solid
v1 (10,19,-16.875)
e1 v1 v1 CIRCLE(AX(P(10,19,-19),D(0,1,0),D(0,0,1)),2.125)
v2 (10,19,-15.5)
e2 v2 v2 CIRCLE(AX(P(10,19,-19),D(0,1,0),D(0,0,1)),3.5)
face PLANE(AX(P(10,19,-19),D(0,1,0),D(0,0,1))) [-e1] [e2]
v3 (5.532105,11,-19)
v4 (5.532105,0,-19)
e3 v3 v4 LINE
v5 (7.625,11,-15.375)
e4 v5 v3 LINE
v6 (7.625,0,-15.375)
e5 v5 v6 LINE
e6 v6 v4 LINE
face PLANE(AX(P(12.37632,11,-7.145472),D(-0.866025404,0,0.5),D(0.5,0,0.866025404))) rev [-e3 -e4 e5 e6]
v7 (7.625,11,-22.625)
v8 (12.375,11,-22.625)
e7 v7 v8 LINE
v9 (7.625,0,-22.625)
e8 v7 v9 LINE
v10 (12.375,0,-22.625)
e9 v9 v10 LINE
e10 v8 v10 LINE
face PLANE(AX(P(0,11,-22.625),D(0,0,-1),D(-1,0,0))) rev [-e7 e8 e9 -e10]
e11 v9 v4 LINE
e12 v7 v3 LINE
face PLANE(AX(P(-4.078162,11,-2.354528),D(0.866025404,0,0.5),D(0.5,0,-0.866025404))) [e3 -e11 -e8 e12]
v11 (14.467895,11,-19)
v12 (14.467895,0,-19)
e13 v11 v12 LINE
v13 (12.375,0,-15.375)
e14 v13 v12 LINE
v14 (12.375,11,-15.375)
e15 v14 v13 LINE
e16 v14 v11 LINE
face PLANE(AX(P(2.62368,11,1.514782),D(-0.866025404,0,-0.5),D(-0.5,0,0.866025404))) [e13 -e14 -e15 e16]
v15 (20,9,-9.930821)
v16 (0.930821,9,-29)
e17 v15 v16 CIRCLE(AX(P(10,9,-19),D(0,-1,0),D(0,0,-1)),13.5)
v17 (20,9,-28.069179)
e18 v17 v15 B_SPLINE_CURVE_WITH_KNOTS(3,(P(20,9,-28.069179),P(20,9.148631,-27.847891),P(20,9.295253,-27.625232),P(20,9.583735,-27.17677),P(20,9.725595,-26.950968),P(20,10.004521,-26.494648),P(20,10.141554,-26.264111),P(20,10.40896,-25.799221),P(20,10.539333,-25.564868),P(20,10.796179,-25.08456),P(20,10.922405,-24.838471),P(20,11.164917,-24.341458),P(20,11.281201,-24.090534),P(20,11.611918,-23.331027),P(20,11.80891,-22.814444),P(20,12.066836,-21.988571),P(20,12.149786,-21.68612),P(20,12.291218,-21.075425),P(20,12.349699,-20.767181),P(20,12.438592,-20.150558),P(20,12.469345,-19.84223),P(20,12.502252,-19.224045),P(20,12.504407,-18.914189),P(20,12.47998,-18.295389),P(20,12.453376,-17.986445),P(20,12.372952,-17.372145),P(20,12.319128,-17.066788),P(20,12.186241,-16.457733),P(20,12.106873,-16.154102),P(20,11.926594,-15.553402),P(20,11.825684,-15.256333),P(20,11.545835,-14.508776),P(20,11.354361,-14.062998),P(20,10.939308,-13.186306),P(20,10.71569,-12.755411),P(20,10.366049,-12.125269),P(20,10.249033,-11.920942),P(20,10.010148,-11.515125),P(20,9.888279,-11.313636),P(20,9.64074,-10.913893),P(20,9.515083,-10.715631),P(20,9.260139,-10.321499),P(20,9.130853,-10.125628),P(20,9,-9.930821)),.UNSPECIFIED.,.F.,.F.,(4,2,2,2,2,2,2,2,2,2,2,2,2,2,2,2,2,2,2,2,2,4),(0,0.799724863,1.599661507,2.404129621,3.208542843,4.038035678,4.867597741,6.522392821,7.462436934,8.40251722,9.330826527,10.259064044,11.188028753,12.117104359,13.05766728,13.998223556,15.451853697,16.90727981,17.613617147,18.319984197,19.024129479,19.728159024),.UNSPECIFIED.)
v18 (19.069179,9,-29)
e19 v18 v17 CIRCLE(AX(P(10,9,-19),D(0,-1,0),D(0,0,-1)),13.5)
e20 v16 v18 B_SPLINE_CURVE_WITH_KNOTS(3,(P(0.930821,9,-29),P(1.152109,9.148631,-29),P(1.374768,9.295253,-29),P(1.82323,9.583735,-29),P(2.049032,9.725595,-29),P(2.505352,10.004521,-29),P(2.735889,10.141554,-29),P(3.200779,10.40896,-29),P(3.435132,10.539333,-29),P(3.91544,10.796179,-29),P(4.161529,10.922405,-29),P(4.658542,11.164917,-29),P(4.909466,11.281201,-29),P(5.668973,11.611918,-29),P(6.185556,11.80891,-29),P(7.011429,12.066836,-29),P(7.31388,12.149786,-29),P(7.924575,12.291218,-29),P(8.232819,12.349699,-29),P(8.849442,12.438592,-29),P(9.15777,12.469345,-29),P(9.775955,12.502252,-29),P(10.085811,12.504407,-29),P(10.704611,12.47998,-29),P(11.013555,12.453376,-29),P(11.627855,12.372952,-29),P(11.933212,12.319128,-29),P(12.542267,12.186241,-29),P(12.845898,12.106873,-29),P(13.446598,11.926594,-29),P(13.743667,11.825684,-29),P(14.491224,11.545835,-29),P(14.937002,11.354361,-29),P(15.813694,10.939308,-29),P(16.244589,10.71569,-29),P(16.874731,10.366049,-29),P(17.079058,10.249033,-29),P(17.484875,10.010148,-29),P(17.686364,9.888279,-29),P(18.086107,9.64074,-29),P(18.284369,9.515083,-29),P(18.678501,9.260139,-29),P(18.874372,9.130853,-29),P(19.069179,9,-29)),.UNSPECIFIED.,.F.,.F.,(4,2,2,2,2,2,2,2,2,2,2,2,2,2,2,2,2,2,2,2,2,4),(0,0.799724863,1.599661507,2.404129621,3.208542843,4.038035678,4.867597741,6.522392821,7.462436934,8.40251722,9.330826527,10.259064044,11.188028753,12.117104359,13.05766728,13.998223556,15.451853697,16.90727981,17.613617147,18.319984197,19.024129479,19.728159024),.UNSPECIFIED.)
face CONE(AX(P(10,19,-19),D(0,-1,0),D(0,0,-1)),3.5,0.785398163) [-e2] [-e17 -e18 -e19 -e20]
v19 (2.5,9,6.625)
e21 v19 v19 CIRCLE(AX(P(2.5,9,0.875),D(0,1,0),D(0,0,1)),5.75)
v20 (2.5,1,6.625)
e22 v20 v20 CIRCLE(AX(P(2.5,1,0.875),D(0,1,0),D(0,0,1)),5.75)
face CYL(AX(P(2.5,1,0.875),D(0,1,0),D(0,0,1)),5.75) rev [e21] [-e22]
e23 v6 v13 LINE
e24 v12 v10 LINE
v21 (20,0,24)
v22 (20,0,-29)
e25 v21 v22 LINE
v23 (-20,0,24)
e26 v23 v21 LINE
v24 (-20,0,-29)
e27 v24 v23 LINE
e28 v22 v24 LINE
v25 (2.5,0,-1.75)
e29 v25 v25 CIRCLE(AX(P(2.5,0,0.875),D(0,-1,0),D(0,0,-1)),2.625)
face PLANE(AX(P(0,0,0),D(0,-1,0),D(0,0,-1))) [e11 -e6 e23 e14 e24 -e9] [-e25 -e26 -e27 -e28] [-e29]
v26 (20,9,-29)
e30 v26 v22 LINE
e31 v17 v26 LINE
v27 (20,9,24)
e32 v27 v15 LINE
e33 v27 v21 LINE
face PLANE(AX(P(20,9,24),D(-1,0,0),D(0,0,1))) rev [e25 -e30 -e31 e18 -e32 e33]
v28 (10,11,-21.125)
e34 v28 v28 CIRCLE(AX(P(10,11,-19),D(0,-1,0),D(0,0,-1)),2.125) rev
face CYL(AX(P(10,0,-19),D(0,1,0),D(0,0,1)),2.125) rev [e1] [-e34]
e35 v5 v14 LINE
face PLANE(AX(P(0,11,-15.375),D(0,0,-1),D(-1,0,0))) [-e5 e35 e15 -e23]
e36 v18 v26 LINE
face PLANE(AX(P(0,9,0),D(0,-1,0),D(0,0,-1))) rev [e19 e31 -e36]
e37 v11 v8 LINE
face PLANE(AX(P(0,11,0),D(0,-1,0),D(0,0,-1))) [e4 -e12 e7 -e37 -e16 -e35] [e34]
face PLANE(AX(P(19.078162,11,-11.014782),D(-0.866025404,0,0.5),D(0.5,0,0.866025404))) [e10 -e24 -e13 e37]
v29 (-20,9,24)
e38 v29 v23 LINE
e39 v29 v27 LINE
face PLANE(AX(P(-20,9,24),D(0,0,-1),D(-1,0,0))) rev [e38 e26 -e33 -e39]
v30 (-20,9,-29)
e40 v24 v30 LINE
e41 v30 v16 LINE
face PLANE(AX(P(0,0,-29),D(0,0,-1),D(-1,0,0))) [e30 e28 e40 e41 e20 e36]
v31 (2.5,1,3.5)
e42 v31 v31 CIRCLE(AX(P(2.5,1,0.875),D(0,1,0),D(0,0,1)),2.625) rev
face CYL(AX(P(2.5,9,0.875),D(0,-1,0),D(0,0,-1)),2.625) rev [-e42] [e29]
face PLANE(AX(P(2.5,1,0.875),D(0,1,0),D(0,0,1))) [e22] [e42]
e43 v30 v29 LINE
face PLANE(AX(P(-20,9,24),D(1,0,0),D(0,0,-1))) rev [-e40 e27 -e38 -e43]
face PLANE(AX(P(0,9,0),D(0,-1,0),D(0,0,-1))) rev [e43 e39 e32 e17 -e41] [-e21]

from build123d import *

# Parameters (mm, degrees)
SKETCH1_W               = 40
SKETCH1_H               = 48
BOSS_EXTRUDE1_DEPTH     = 9
CUT_EXTRUDE1_DEPTH      = 33.511536414
CUT_EXTRUDE1_DEPTH_BACK = 33.511536414
SKETCH2_R               = 2.625
SKETCH3_R               = 5.75
CUT_EXTRUDE2_DEPTH      = 8
SKETCH5_R               = 3.5
BOSS_EXTRUDE2_DEPTH     = 10
SKETCH6_W               = 40
SKETCH6_H               = 9
BOSS_EXTRUDE3_DEPTH     = 5
CHAMFER1_SIZE           = 10
CUT_EXTRUDE3_DEPTH      = 41.024992192
CUT_EXTRUDE3_DEPTH_BACK = 41.024992192
SKETCH7_R               = 2.125
CUT_EXTRUDE4_START      = -11
SKETCH8_W               = 4.75
SKETCH8_H               = 7.25
SKETCH8_R               = 2.125
CUT_EXTRUDE4_DEPTH      = 11


with BuildPart() as part:
    # Sketch1 → Boss-Extrude1 (new body)
    with BuildSketch(Plane(origin=(0, 0, 0), x_dir=(1, 0, 0), z_dir=(0, 1, 0))):
        Rectangle(SKETCH1_W, SKETCH1_H)
    extrude(amount=BOSS_EXTRUDE1_DEPTH)

    # Sketch2 → Cut-Extrude1 (cut, two sides: drawn at the far end of the back side and taken through both)
    with BuildSketch(Plane.XZ.offset(-CUT_EXTRUDE1_DEPTH_BACK)):
        with Locations(Location((2.5, 0.875, 0), (0, 0, 270))):
            Circle(SKETCH2_R)
    extrude(amount=CUT_EXTRUDE1_DEPTH + CUT_EXTRUDE1_DEPTH_BACK, mode=Mode.SUBTRACT)

    # Sketch3 → Cut-Extrude2 (cut)
    with BuildSketch(Plane(origin=(0, 9, 0), x_dir=(1, 0, 0), z_dir=(0, 1, 0))):
        with Locations(Location((2.5, -0.875, 0), (0, 0, 270))):
            Circle(SKETCH3_R)
    extrude(amount=-CUT_EXTRUDE2_DEPTH, mode=Mode.SUBTRACT)

    # Sketch5 → Boss-Extrude2 (add)
    with BuildSketch(Plane(origin=(0, 9, 0), x_dir=(1, 0, 0), z_dir=(0, 1, 0))):
        with Locations(Location((10, 19, 0), (0, 0, 90))):
            Circle(SKETCH5_R)
    extrude(amount=BOSS_EXTRUDE2_DEPTH)

    # Sketch6 → Boss-Extrude3 (add)
    with BuildSketch(Plane(origin=(0, 0, -24), x_dir=(-1, 0, 0), z_dir=(0, 0, -1))):
        with Locations((0, 4.5)):
            Rectangle(SKETCH6_W, SKETCH6_H)
    extrude(amount=BOSS_EXTRUDE3_DEPTH)

    # Chamfer1
    # the kernel refuses this chamfer: 10 mm, written as the material it adds along each edge
    with BuildSketch(Plane(origin=(10, 9, -19), x_dir=(0, 0, -1), z_dir=(1, 0, 0))) as chamfer1_piece_1_section:
        Polygon((3.5 + CHAMFER1_SIZE, 0), (3.5, CHAMFER1_SIZE), (3.5, 0), align=None)
    chamfer1_piece_1 = revolve(axis=Axis((10, 9, -19), (0, 1, 0)), mode=Mode.PRIVATE)
    chamfer1_piece_1 = split(chamfer1_piece_1, bisect_by=Plane(origin=(20, 13.766694853, -10.450462434), z_dir=(-1, 0, 0)), keep=Keep.TOP, mode=Mode.PRIVATE)
    chamfer1_piece_1 = split(chamfer1_piece_1, bisect_by=Plane(origin=(10, 13.766694853, -29), z_dir=(0, 0, 1)), keep=Keep.TOP, mode=Mode.PRIVATE)
    chamfer1_piece_1 = split(chamfer1_piece_1, bisect_by=Plane(origin=(10, 19, -10.450462434), z_dir=(0, -1, 0)), keep=Keep.TOP, mode=Mode.PRIVATE)
    add(chamfer1_piece_1)

    # Sketch7 → Cut-Extrude3 (cut, two sides: drawn at the far end of the back side and taken through both)
    with BuildSketch(Plane(origin=(0, 19, 0), x_dir=(1, 0, 0), z_dir=(0, 1, 0)).offset(-CUT_EXTRUDE3_DEPTH_BACK)):
        with Locations(Location((10, 19, 0), (0, 0, 270))):
            Circle(SKETCH7_R)
    extrude(amount=CUT_EXTRUDE3_DEPTH + CUT_EXTRUDE3_DEPTH_BACK, mode=Mode.SUBTRACT)

    # Sketch8 → Cut-Extrude4 (cut)
    # profile 1 of 3: a face of its own
    with BuildSketch(Plane.XZ.offset(CUT_EXTRUDE4_START)):
        with Locations((10, -19)):
            Rectangle(SKETCH8_W, SKETCH8_H)
        with Locations(Location((10, -19, 0), (0, 0, 90))):
            Circle(SKETCH8_R, mode=Mode.SUBTRACT)
    # profile 2 of 3: a face of its own
    with BuildSketch(Plane.XZ.offset(CUT_EXTRUDE4_START)):
        Polygon((7.625, -22.625), (7.625, -15.375), (5.532105274, -19), align=None)
    # profile 3 of 3: a face of its own
    with BuildSketch(Plane.XZ.offset(CUT_EXTRUDE4_START)):
        Polygon((14.467894726, -19), (12.375, -22.625), (12.375, -15.375), align=None)
    extrude(amount=CUT_EXTRUDE4_DEPTH, mode=Mode.SUBTRACT)


solid = part.part
